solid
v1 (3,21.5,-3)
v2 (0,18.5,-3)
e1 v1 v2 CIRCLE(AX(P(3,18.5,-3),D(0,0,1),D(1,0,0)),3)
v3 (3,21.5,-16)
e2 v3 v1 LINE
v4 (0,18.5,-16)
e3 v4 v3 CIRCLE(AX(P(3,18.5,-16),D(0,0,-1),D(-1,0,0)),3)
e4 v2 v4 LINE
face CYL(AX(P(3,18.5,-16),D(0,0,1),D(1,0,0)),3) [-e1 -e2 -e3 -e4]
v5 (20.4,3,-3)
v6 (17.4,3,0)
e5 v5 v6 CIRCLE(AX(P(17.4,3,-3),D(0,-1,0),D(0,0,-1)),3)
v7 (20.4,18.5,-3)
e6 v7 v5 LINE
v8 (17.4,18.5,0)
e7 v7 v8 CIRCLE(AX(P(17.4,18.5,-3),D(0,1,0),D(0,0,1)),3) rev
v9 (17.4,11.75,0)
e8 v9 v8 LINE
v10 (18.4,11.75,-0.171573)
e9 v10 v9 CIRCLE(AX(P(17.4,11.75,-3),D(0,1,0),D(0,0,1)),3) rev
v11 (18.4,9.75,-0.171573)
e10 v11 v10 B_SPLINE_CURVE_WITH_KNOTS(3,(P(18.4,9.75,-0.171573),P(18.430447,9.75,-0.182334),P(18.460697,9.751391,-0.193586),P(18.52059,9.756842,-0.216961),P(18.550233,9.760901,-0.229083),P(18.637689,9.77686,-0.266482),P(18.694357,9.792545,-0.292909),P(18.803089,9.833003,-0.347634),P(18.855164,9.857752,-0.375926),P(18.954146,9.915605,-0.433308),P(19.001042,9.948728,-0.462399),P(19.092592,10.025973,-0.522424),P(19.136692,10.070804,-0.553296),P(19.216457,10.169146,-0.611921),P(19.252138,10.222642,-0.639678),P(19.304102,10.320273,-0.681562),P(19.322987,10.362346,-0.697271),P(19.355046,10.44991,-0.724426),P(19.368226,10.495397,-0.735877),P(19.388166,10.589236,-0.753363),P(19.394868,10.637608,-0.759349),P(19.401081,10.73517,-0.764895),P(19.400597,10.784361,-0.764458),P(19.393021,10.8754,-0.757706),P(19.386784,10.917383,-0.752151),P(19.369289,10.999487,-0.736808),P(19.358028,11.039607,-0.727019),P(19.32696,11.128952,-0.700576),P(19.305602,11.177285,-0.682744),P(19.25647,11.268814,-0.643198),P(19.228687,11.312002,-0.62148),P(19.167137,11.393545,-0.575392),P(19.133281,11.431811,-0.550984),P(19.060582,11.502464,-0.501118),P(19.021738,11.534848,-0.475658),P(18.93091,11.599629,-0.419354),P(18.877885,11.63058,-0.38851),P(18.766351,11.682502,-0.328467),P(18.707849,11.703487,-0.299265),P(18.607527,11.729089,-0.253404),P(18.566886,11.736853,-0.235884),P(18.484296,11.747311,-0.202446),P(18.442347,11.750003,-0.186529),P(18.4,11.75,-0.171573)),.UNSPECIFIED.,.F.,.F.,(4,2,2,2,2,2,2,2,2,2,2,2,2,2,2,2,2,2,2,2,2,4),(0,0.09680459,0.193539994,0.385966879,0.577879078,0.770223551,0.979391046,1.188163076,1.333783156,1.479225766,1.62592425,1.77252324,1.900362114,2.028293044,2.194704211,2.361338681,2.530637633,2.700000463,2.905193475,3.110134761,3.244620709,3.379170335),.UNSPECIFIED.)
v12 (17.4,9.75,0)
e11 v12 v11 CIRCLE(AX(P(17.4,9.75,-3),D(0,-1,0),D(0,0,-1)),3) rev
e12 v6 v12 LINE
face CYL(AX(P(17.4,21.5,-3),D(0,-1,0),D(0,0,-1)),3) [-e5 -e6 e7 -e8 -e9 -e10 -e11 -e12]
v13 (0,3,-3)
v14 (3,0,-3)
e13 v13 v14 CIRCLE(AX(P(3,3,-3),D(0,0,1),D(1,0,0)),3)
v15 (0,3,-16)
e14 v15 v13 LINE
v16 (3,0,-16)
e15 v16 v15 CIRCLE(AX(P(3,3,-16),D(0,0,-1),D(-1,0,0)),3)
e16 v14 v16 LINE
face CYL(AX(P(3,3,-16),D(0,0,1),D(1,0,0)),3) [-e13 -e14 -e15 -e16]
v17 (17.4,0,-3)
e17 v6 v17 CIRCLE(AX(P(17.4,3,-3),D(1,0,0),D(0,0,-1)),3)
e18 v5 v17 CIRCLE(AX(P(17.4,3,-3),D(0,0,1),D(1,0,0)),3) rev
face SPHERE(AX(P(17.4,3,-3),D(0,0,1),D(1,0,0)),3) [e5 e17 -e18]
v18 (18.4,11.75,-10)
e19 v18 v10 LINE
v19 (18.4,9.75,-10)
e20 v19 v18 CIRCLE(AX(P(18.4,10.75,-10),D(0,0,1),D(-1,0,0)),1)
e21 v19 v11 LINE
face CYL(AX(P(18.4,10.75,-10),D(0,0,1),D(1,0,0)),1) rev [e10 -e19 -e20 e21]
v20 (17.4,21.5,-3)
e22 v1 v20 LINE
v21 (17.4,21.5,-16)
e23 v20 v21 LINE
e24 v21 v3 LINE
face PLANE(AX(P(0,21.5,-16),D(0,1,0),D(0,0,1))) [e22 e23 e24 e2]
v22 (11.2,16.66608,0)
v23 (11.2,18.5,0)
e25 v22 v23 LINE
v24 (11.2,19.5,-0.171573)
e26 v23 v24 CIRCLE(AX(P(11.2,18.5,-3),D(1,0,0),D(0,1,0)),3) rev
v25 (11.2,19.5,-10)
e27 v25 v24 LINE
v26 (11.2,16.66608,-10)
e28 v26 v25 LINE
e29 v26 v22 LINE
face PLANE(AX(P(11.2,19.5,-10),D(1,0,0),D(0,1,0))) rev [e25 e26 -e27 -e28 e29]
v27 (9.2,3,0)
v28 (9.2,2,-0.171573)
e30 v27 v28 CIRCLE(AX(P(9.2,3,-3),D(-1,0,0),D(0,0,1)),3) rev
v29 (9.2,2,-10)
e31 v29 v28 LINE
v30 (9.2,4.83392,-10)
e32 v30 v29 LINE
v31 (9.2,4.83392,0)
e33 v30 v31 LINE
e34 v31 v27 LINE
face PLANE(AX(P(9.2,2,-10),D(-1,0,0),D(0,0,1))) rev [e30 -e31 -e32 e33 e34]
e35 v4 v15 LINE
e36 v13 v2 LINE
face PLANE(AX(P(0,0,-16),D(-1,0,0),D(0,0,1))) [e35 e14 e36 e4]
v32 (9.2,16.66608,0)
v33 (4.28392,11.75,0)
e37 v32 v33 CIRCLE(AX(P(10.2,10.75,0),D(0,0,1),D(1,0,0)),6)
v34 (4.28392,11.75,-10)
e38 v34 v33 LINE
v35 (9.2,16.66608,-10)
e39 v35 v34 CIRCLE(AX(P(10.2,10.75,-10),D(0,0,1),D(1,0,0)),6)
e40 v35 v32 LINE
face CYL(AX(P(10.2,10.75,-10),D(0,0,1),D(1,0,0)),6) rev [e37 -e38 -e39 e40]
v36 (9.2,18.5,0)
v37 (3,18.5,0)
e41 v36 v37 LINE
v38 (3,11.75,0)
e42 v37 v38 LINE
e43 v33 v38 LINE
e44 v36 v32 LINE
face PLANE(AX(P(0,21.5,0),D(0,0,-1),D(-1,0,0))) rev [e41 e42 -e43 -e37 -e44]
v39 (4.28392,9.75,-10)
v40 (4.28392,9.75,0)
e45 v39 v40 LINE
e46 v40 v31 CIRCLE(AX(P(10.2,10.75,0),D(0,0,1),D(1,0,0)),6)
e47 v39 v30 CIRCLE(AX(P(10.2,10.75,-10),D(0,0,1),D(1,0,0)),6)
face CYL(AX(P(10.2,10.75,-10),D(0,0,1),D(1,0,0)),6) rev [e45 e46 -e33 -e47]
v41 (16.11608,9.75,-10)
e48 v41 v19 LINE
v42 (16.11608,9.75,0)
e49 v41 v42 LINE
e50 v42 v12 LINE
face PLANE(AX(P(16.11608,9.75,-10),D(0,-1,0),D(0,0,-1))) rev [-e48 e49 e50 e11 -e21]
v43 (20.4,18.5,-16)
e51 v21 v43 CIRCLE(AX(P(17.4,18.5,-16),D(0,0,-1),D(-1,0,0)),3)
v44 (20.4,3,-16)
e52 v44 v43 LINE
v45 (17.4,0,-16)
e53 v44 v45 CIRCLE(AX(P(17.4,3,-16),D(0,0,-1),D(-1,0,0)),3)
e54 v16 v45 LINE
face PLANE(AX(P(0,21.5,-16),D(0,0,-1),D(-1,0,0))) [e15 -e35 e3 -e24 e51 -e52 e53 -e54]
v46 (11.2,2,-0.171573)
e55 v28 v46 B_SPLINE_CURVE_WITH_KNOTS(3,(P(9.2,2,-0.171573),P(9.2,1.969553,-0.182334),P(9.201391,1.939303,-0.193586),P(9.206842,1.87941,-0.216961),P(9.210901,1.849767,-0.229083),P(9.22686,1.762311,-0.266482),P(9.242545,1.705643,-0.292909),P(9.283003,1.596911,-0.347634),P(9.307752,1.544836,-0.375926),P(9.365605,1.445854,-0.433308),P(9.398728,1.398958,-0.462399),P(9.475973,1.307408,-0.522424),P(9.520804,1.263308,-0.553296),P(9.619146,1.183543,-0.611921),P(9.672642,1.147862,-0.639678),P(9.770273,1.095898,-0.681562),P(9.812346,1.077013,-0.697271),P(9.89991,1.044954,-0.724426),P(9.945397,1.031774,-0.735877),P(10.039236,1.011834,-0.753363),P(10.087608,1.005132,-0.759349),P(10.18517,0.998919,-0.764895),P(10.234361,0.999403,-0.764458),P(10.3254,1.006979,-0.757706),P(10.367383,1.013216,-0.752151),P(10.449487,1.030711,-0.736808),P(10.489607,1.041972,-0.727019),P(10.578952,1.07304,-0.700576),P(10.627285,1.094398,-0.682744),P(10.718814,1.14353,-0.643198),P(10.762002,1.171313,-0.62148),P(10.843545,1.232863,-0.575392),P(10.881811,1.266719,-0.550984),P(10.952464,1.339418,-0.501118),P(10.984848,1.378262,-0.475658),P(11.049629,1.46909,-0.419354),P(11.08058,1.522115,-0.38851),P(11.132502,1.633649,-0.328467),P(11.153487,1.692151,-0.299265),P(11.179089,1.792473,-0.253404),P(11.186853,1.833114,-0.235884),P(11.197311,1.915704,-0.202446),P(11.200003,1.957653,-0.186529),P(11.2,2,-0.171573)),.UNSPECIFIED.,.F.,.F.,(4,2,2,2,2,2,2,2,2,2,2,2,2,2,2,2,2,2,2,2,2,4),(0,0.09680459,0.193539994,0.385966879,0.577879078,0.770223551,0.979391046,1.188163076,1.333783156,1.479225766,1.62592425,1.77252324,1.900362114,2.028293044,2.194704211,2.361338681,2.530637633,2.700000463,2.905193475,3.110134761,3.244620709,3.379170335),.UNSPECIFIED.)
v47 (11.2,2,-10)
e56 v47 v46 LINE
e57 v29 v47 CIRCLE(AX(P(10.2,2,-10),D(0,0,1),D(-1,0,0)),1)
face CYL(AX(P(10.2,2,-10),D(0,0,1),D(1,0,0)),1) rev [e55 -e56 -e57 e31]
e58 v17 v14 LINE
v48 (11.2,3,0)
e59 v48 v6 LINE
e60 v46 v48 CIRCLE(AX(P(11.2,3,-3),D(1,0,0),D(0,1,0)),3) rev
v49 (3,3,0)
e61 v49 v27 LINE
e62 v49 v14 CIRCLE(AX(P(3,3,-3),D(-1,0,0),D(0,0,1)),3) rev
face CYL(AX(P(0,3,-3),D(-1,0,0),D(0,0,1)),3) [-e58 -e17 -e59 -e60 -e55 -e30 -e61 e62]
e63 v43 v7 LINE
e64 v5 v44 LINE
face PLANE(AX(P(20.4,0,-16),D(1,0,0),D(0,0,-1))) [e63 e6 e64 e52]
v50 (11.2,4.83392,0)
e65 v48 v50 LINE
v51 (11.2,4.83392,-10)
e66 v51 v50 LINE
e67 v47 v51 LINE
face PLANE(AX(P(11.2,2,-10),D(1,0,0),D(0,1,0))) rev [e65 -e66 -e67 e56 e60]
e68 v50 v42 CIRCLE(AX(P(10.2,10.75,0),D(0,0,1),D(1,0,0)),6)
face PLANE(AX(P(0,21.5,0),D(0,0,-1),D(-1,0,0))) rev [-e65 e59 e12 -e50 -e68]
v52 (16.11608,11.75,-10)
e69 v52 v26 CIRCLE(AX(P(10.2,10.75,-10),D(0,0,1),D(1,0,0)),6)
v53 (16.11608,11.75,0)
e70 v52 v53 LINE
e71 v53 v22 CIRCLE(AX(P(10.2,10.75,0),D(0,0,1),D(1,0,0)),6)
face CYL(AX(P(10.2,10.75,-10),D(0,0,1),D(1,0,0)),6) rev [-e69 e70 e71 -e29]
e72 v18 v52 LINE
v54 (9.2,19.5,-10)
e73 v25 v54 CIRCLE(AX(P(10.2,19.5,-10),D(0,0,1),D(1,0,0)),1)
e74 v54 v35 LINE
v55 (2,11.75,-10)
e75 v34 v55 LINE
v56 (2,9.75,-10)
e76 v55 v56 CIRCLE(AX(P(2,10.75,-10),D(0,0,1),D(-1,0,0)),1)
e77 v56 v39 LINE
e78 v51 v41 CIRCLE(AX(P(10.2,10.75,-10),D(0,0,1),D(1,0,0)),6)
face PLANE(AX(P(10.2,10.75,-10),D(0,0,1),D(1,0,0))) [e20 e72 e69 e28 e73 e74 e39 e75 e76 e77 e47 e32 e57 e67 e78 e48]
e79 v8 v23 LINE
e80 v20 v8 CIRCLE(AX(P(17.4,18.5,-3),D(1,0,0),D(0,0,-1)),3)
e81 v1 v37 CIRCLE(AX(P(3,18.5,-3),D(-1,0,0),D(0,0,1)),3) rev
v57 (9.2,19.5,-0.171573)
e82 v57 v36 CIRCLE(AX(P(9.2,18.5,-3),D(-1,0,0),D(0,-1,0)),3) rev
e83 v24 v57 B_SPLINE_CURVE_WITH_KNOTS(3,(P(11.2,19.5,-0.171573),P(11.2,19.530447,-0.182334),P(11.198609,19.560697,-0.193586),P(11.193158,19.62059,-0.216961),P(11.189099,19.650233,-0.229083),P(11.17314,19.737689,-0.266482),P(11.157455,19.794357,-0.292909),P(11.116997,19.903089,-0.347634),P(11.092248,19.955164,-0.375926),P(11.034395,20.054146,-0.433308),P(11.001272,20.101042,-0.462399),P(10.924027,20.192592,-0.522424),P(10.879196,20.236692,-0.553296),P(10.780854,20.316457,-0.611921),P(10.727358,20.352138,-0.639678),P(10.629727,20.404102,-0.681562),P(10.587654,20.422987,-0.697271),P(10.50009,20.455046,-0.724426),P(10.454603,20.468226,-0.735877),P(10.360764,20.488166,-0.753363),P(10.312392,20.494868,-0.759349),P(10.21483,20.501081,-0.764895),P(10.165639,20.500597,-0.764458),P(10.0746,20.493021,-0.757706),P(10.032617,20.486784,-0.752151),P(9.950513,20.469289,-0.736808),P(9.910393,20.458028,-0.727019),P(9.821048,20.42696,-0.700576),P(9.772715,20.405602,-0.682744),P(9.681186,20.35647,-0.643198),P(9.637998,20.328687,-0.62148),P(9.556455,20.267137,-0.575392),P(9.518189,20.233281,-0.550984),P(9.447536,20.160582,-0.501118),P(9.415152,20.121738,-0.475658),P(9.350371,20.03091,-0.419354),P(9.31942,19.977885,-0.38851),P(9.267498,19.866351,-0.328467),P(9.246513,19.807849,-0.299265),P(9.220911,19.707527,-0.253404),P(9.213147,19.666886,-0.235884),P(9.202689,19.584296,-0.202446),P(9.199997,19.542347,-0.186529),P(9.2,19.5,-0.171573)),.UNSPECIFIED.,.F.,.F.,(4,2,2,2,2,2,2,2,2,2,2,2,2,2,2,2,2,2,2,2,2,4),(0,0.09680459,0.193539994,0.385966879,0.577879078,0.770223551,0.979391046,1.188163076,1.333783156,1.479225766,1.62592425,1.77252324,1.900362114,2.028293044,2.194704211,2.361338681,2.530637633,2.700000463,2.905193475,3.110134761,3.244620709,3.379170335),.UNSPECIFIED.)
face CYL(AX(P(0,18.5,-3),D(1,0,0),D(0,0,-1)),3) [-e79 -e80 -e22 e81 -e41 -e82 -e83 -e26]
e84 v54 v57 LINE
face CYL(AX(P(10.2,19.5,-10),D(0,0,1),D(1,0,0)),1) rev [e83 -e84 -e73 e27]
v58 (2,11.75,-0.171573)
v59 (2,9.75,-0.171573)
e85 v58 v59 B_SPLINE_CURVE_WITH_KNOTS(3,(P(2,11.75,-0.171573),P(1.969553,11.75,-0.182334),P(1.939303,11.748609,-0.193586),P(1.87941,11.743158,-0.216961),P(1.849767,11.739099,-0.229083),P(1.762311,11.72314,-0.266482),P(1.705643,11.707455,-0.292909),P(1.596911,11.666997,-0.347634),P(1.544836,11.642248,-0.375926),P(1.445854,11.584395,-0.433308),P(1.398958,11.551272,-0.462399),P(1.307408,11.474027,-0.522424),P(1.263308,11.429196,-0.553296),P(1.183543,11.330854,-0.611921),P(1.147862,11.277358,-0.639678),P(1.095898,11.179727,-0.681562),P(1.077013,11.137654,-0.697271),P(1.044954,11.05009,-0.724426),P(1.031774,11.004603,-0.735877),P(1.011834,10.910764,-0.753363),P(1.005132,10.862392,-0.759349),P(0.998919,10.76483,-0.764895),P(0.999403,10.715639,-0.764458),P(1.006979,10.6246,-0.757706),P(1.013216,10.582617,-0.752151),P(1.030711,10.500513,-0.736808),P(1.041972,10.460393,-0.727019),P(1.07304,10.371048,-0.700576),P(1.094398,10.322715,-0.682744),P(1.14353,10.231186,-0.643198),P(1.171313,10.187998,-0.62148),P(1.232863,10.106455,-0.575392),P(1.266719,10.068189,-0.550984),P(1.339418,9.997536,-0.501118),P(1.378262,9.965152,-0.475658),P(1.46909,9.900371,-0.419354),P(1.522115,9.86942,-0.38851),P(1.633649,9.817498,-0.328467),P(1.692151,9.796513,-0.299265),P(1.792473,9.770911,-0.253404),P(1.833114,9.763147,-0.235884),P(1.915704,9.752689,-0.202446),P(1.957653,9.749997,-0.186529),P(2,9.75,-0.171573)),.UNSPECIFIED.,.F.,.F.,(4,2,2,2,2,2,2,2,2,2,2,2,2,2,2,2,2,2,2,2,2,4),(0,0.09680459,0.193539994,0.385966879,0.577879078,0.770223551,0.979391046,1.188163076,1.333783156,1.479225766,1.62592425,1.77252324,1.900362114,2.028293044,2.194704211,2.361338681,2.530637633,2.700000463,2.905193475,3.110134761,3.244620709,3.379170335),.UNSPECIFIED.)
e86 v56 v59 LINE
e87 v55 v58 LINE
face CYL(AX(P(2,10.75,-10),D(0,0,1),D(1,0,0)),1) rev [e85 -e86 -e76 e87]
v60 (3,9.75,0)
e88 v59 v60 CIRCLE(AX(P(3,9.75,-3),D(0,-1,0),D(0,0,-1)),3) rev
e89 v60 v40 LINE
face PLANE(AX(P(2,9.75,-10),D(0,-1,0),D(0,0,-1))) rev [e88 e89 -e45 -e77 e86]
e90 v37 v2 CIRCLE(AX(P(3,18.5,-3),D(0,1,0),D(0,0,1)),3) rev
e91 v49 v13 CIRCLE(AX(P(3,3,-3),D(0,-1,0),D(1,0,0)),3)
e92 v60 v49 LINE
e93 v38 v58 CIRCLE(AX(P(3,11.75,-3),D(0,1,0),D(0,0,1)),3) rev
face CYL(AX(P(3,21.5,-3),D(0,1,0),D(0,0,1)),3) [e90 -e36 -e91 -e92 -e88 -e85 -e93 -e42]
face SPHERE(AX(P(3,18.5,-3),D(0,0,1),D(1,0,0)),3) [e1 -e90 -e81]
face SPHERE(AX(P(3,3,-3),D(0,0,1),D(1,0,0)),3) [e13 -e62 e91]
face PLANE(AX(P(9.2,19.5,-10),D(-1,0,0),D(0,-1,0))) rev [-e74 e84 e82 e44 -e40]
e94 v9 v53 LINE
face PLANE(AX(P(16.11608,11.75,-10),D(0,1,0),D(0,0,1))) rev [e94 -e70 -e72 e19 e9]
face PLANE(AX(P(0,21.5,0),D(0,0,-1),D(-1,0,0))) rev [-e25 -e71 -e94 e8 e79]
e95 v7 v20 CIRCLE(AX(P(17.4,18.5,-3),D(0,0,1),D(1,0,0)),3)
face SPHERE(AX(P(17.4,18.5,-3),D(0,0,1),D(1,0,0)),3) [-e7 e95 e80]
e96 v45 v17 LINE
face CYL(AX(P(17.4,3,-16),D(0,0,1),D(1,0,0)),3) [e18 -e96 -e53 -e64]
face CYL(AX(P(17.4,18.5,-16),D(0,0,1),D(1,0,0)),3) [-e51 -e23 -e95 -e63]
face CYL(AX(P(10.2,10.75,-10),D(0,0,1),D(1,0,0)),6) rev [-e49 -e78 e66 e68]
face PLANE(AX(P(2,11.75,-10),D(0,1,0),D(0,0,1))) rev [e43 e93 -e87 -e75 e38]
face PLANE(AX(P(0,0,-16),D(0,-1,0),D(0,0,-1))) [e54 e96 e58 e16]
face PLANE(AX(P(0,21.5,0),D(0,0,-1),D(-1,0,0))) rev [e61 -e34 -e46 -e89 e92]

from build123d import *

# Parameters (mm, degrees)
SKETCH1_W       = 20.4
SKETCH1_H       = 21.5
EXTRUDE1_DEPTH  = 16
EXTRUDE10_DEPTH = 10
FILLET8_R       = 3


with BuildPart() as part:
    # Sketch1 → Extrude1 (new body)
    with BuildSketch(Plane.XY):
        with Locations((10.2, 10.75)):
            Rectangle(SKETCH1_W, SKETCH1_H)
    extrude(amount=-EXTRUDE1_DEPTH)

    # Sketch11 → Extrude10 (cut)
    with BuildSketch(Plane.XY):
        with BuildLine():
            Line((2, 11.75), (4.283920217, 11.75))
            ThreePointArc((4.283920217, 11.75), (5.957359313, 14.992640687), (9.2, 16.666079783))
            Line((9.2, 16.666079783), (9.2, 19.5))
            ThreePointArc((9.2, 19.5), (10.2, 20.5), (11.2, 19.5))
            Line((11.2, 19.5), (11.2, 16.666079783))
            ThreePointArc((11.2, 16.666079783), (14.442640687, 14.992640687), (16.116079783, 11.75))
            Line((16.116079783, 11.75), (18.4, 11.75))
            ThreePointArc((18.4, 11.75), (19.4, 10.75), (18.4, 9.75))
            Line((18.4, 9.75), (16.116079783, 9.75))
            ThreePointArc((16.116079783, 9.75), (14.442640687, 6.507359313), (11.2, 4.833920217))
            Line((11.2, 4.833920217), (11.2, 2))
            ThreePointArc((11.2, 2), (10.2, 1), (9.2, 2))
            Line((9.2, 2), (9.2, 4.833920217))
            ThreePointArc((9.2, 4.833920217), (5.957359313, 6.507359313), (4.283920217, 9.75))
            Line((4.283920217, 9.75), (2, 9.75))
            ThreePointArc((2, 9.75), (1, 10.75), (2, 11.75))
        make_face()
    extrude(amount=-EXTRUDE10_DEPTH, mode=Mode.SUBTRACT)

    # Fillet8
    # the kernel refuses this fillet: 3 mm, written as the material it takes off along each edge
    with BuildSketch(Plane(origin=(17.4, 3, -3), x_dir=(1, 0, 0), z_dir=(0, -1, 0))) as fillet8_piece_1_section:
        Polygon((0, 0), (FILLET8_R, 0), (FILLET8_R, FILLET8_R), (0, FILLET8_R), align=None)
    fillet8_piece_1 = extrude(amount=FILLET8_R, mode=Mode.PRIVATE)
    fillet8_piece_1 = fillet8_piece_1 - Plane(origin=(17.4, 3, -3), x_dir=(-0.7071067811865475, 0, -0.7071067811865475), z_dir=(0, -1, 0)) * Sphere(FILLET8_R, mode=Mode.PRIVATE)
    add(fillet8_piece_1, mode=Mode.SUBTRACT)
    with BuildSketch(Plane(origin=(17.4, 18.5, -3), x_dir=(0, 0, 1), z_dir=(1, 0, 0))) as fillet8_piece_2_section:
        Polygon((0, 0), (FILLET8_R, 0), (FILLET8_R, -FILLET8_R), (0, -FILLET8_R), align=None)
    fillet8_piece_2 = extrude(amount=FILLET8_R, mode=Mode.PRIVATE)
    fillet8_piece_2 = fillet8_piece_2 - Plane(origin=(17.4, 18.5, -3), x_dir=(0, -0.7071067811865475, -0.7071067811865475), z_dir=(1, 0, 0)) * Sphere(FILLET8_R, mode=Mode.PRIVATE)
    add(fillet8_piece_2, mode=Mode.SUBTRACT)
    with BuildSketch(Plane(origin=(3, 3, -3), x_dir=(-1, 0, 0), z_dir=(0, -1, 0))) as fillet8_piece_3_section:
        Polygon((0, 0), (FILLET8_R, 0), (FILLET8_R, -FILLET8_R), (0, -FILLET8_R), align=None)
    fillet8_piece_3 = extrude(amount=FILLET8_R, mode=Mode.PRIVATE)
    fillet8_piece_3 = fillet8_piece_3 - Plane(origin=(3, 3, -3), x_dir=(0.7071067811865475, 0, -0.7071067811865475), z_dir=(0, -1, 0)) * Sphere(FILLET8_R, mode=Mode.PRIVATE)
    add(fillet8_piece_3, mode=Mode.SUBTRACT)
    with BuildSketch(Plane(origin=(3, 18.5, -3), x_dir=(0, 0, 1), z_dir=(-1, 0, 0))) as fillet8_piece_4_section:
        Polygon((0, 0), (FILLET8_R, 0), (FILLET8_R, FILLET8_R), (0, FILLET8_R), align=None)
    fillet8_piece_4 = extrude(amount=FILLET8_R, mode=Mode.PRIVATE)
    fillet8_piece_4 = fillet8_piece_4 - Plane(origin=(3, 18.5, -3), x_dir=(0, -0.7071067811865475, -0.7071067811865475), z_dir=(-1, 0, 0)) * Sphere(FILLET8_R, mode=Mode.PRIVATE)
    add(fillet8_piece_4, mode=Mode.SUBTRACT)
    with BuildSketch(Plane(origin=(20.4, 3, 0), x_dir=(0, 0, -1), z_dir=(0, 1, 0)), Plane(origin=(0, 18.5, 0), x_dir=(0, 0, -1), z_dir=(0, -1, 0))) as fillet8_piece_5:
        with BuildLine():
            CenterArc((FILLET8_R, FILLET8_R), FILLET8_R, 180, 90)
            Line((0, FILLET8_R), (0, 0))
            Line((0, 0), (FILLET8_R, 0))
        make_face()
    extrude(amount=15.5, mode=Mode.SUBTRACT)
    with BuildSketch(Plane(origin=(3, 0, 0), x_dir=(0, 0, -1), z_dir=(1, 0, 0))) as fillet8_piece_6:
        with BuildLine():
            CenterArc((FILLET8_R, FILLET8_R), FILLET8_R, 180, 90)
            Line((0, FILLET8_R), (0, 0))
            Line((0, 0), (FILLET8_R, 0))
        make_face()
    extrude(amount=14.4, mode=Mode.SUBTRACT)
    with BuildSketch(Plane(origin=(17.4, 21.5, 0), x_dir=(0, -1, 0), z_dir=(-1, 0, 0))) as fillet8_piece_7:
        with BuildLine():
            CenterArc((FILLET8_R, -FILLET8_R), FILLET8_R, 90, 90)
            Line((0, -FILLET8_R), (0, 0))
            Line((0, 0), (FILLET8_R, 0))
        make_face()
    extrude(amount=14.4, mode=Mode.SUBTRACT)
    with BuildSketch(Plane(origin=(20.4, 0, -3), x_dir=(-1, 0, 0), z_dir=(0, 0, -1)), Plane(origin=(20.4, 21.5, -3), x_dir=(0, -1, 0), z_dir=(0, 0, -1))) as fillet8_piece_8:
        with BuildLine():
            CenterArc((FILLET8_R, FILLET8_R), FILLET8_R, 180, 90)
            Line((0, FILLET8_R), (0, 0))
            Line((0, 0), (FILLET8_R, 0))
        make_face()
    extrude(amount=20.5, mode=Mode.SUBTRACT)
    with BuildSketch(Plane(origin=(0, 21.5, -3), x_dir=(0, -1, 0), z_dir=(0, 0, -1)), Plane(origin=(0, 0, -3), x_dir=(1, 0, 0), z_dir=(0, 0, -1))) as fillet8_piece_9:
        with BuildLine():
            CenterArc((FILLET8_R, -FILLET8_R), FILLET8_R, 90, 90)
            Line((0, -FILLET8_R), (0, 0))
            Line((0, 0), (FILLET8_R, 0))
        make_face()
    extrude(amount=20.5, mode=Mode.SUBTRACT)


solid = part.part
